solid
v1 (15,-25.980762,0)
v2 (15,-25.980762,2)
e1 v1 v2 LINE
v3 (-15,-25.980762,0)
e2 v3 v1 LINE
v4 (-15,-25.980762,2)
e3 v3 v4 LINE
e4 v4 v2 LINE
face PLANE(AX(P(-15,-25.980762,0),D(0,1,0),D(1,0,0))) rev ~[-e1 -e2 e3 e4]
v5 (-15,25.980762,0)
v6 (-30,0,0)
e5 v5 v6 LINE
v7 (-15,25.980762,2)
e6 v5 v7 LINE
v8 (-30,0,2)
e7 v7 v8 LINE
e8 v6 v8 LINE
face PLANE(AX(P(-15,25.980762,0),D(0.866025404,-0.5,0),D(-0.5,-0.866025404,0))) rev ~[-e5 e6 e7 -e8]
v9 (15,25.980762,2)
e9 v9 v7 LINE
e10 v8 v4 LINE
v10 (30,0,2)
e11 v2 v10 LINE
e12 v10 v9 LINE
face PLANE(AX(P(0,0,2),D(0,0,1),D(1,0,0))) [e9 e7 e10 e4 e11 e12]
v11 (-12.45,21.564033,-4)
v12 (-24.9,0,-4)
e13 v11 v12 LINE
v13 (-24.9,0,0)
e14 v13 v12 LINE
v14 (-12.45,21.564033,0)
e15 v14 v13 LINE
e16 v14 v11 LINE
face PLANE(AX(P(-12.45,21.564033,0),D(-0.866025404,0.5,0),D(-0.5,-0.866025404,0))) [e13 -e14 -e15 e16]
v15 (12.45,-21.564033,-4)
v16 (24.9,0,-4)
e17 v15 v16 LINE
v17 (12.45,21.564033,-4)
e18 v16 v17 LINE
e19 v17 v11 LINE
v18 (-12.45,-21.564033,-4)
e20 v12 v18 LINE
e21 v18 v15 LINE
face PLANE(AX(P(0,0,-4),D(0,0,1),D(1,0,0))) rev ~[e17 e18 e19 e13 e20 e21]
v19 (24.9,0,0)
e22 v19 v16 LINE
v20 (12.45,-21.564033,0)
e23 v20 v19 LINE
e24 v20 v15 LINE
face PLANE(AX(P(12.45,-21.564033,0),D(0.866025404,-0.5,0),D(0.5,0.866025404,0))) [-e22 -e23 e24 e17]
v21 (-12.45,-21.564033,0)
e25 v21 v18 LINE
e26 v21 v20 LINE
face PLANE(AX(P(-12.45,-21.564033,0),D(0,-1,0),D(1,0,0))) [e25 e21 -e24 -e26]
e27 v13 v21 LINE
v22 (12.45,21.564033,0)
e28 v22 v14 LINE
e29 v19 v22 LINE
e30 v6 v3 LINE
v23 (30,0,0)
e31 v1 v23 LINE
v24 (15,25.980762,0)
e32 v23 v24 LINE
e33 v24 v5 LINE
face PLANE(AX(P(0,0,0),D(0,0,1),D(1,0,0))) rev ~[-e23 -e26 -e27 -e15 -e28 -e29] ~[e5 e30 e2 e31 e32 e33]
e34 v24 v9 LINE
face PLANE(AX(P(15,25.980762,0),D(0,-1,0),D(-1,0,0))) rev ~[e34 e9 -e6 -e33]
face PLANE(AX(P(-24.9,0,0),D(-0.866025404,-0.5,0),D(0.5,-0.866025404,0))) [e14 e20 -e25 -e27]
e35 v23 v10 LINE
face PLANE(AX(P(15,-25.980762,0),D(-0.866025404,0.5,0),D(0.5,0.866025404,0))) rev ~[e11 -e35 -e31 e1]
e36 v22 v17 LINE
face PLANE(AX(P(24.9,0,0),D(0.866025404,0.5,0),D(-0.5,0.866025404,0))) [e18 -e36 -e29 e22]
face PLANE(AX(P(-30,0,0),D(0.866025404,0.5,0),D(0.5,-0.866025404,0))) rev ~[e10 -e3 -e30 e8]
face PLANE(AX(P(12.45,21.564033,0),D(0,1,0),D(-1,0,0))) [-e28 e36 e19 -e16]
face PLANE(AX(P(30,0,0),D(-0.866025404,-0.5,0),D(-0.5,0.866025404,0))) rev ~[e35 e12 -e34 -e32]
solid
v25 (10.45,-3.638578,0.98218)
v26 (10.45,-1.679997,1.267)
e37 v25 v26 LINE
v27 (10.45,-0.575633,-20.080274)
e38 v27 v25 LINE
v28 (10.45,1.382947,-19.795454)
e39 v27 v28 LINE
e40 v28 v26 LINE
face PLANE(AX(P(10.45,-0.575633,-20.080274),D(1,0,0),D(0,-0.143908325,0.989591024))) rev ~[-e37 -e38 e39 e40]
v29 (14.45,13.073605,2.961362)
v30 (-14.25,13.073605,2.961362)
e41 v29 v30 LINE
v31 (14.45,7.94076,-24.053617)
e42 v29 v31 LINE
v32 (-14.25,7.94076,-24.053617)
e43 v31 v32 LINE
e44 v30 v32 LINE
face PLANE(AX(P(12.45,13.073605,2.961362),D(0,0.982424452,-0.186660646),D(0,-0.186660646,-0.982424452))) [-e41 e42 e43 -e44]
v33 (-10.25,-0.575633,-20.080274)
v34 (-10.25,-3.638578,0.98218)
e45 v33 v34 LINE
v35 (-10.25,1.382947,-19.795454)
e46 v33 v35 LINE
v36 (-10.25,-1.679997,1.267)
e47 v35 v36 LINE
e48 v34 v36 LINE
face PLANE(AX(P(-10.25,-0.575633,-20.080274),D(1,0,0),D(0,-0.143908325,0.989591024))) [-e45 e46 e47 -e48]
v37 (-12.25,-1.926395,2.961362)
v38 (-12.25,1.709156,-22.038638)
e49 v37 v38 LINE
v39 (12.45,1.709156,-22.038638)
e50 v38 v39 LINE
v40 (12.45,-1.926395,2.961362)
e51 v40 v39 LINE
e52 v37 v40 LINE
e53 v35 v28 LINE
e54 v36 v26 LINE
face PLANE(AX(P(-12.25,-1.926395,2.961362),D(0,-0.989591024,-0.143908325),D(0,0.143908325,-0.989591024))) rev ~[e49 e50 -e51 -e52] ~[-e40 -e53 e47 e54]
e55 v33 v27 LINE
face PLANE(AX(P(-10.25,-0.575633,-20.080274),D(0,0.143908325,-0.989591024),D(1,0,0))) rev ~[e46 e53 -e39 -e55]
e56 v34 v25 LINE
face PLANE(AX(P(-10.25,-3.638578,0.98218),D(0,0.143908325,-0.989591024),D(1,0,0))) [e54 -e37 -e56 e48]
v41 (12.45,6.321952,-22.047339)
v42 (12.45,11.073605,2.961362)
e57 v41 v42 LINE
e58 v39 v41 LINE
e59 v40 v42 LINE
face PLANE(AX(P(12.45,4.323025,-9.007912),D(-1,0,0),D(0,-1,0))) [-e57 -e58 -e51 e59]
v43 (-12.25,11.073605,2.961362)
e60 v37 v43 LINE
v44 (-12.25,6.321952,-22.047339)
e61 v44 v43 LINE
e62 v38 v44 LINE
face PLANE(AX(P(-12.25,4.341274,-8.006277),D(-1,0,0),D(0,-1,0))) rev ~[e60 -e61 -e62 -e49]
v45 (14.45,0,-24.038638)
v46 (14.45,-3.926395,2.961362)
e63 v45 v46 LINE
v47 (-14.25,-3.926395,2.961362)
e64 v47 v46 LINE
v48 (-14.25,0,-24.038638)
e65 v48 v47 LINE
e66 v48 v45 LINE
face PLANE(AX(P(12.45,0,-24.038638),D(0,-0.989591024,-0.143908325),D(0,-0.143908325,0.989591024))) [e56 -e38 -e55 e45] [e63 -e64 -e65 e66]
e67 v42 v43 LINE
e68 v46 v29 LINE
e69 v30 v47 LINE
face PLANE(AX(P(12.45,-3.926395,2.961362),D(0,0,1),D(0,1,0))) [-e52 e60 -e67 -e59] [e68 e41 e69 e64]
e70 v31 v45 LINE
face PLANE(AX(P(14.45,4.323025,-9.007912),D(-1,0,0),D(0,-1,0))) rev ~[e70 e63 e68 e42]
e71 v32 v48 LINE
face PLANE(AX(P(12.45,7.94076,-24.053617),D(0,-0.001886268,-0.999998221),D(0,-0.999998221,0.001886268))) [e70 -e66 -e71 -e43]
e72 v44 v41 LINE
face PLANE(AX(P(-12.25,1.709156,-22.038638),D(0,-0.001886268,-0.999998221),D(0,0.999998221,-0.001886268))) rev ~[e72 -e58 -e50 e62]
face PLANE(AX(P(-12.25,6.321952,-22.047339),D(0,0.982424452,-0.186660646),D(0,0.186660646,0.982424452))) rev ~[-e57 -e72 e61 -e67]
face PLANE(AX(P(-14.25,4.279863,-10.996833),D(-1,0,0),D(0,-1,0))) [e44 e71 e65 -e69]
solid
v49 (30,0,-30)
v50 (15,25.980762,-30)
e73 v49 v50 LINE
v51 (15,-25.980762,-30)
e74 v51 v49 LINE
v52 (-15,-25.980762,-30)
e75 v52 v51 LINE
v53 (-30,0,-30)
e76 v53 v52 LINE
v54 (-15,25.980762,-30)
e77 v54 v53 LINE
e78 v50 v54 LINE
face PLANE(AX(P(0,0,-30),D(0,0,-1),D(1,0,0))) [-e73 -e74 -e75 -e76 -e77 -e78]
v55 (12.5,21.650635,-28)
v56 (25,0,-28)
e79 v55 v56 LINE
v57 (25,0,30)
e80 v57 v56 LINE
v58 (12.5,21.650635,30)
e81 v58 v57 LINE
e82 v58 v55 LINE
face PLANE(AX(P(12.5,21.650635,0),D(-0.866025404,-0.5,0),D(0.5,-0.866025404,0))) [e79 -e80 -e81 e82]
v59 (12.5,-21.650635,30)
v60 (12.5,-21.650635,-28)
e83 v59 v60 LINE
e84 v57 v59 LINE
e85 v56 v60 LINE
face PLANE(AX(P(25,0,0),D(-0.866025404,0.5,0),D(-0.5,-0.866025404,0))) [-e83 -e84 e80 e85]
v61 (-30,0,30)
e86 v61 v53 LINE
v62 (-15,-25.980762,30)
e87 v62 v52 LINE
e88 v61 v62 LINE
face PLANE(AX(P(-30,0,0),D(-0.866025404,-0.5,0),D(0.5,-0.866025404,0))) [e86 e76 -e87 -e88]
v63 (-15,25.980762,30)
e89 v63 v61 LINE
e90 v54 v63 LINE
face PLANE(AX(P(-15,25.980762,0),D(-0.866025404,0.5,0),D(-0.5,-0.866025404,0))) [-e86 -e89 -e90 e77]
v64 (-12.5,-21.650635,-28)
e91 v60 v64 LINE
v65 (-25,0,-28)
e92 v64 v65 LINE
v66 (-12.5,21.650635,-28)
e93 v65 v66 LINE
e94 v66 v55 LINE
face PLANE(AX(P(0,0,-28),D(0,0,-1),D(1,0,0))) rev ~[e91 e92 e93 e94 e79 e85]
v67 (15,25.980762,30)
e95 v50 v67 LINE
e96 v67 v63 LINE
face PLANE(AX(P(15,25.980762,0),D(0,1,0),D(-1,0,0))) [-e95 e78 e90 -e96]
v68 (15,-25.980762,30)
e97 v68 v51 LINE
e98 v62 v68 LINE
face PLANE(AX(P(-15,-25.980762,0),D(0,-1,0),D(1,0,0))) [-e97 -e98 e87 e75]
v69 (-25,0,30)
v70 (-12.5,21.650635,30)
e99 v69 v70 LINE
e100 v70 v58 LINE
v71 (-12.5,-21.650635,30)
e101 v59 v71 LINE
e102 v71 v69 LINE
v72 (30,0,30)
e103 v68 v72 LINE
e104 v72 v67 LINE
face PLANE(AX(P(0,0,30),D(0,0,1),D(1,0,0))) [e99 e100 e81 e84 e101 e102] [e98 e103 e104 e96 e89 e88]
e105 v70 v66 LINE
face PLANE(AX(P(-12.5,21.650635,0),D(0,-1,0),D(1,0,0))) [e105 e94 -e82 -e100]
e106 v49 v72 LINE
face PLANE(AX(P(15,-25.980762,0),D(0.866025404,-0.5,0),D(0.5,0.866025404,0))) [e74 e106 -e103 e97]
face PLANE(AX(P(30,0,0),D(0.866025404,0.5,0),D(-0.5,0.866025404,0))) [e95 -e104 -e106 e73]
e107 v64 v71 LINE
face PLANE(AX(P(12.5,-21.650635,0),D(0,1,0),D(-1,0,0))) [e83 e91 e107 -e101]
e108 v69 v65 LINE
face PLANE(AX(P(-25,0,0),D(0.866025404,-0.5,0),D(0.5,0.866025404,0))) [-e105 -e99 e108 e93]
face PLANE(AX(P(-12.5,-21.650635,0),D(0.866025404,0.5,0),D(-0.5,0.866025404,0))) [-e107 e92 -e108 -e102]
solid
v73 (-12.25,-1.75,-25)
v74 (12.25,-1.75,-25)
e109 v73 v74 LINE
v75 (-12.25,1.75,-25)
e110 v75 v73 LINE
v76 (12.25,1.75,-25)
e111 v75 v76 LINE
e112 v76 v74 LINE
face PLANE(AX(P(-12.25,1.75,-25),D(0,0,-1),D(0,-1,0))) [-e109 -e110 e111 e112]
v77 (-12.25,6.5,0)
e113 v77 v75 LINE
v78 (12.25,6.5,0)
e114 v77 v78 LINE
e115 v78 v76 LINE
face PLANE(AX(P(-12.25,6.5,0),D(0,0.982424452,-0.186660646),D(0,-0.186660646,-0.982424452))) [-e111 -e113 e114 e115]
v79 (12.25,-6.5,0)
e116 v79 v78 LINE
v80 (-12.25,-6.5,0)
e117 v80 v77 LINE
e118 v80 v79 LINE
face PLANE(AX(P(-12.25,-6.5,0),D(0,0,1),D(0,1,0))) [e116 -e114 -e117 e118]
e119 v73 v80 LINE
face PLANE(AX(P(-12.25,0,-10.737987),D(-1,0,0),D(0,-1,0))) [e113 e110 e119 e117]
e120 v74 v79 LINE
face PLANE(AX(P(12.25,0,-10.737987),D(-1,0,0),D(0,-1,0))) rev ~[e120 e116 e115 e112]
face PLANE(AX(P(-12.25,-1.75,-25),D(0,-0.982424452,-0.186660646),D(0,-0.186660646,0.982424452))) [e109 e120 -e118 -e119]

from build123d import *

# Parameters (mm, degrees)
F1_DEPTH  = 30
F4_DEPTH  = 2
F6_DEPTH  = 4
F7_DEPTH  = 2
F13_DEPTH = 24.5
F15_DEPTH = 24.7
F16_DEPTH = 2
F17_DEPTH = 2
F20_DEPTH = 2
F22_W     = 20.7
F22_H     = 21.2839984947
F23_DEPTH = 1.9791820473


with BuildPart() as f1:
    # F0 (on Top) → F1 (new body, symmetric)
    with BuildSketch(Plane.XY):
        Polygon((15, -25.9807621135), (30, 0), (15, 25.9807621135), (-15, 25.9807621135), (-30, 0), (-15, -25.9807621135), align=None)
        Polygon((-12.5, -21.6506350946), (-25, 0), (-12.5, 21.6506350946), (12.5, 21.6506350946), (25, 0), (12.5, -21.6506350946), align=None, mode=Mode.SUBTRACT)
    extrude(amount=F1_DEPTH, both=True)

    # F3 (on 3pt) → F4 (join)
    with BuildSketch(Plane(origin=(0, 0, -30), x_dir=(1, 0, 0), z_dir=(0, 0, -1))):
        Polygon((-25, 0), (-12.5, -21.6506350946), (12.5, -21.6506350946), (25, 0), (12.5, 21.6506350946), (-12.5, 21.6506350946), align=None)
    extrude(amount=-F4_DEPTH)


with BuildPart() as f6:
    # F5 (on Top) → F6 (new body)
    with BuildSketch(Plane.XY):
        Polygon((-12.45, 21.5640325542), (-24.9, 0), (-12.45, -21.5640325542), (12.45, -21.5640325542), (24.9, 0), (12.45, 21.5640325542), align=None)
    extrude(amount=-F6_DEPTH)

    # F5 (on Top) → F7 (join)
    with BuildSketch(Plane.XY):
        Polygon((15, -25.9807621135), (30, 0), (15, 25.9807621135), (-15, 25.9807621135), (-30, 0), (-15, -25.9807621135), align=None)
        Polygon((-12.45, -21.5640325542), (-24.9, 0), (-12.45, 21.5640325542), (12.45, 21.5640325542), (24.9, 0), (12.45, -21.5640325542), align=None, mode=Mode.SUBTRACT)
        Polygon((-12.45, 21.5640325542), (-24.9, 0), (-12.45, -21.5640325542), (12.45, -21.5640325542), (24.9, 0), (12.45, 21.5640325542), align=None)
    extrude(amount=F7_DEPTH)


with BuildPart() as f13:
    # F12 (on 3pt) → F13 (new body)
    with BuildSketch(Plane(origin=(-12.25, 0, 0), x_dir=(0, -1, 0), z_dir=(-1, 0, 0))):
        Polygon((6.5, 0), (-6.5, 0), (-1.75, -25), (1.75, -25), align=None)
    extrude(amount=-F13_DEPTH)


with BuildPart() as f15:
    # F14 (on 3pt) → F15 (new body)
    with BuildSketch(Plane(origin=(-12.25, 0, 0), x_dir=(0, -1, 0), z_dir=(-1, 0, 0))):
        Polygon((-6.321952302, -22.0473393536), (-11.073605489, 2.9613616306), (-13.073605489, 2.9613616306), (-7.9407595883, -24.0536167943), (0, -24.0386383694), (3.926394511, 2.9613616306), (1.926394511, 2.9613616306), (-1.7091559621, -22.0386383694), align=None)
    extrude(amount=-F15_DEPTH)

    # F16 (add): a face of the model
    f16_faces = [f15.faces().sort_by_distance(p)[0] for p in [
        (-12.25, -0.4244847403, -9.5845721632),
    ]]
    extrude(f16_faces, amount=F16_DEPTH)

    # F14 (on 3pt) → F17 (join)
    with BuildSketch(Plane(origin=(-12.25, 0, 0), x_dir=(0, -1, 0), z_dir=(-1, 0, 0))):
        Polygon((1.926394511, 2.9613616306), (-11.073605489, 2.9613616306), (-6.321952302, -22.0473393536), (-1.7091559621, -22.0386383694), align=None)
        Polygon((-6.321952302, -22.0473393536), (-11.073605489, 2.9613616306), (-13.073605489, 2.9613616306), (-7.9407595883, -24.0536167943), (0, -24.0386383694), (3.926394511, 2.9613616306), (1.926394511, 2.9613616306), (-1.7091559621, -22.0386383694), align=None)
    extrude(amount=F17_DEPTH)

    # F19 (on 3pt) → F20 (join)
    with BuildSketch(Plane(origin=(12.45, 0, 0), x_dir=(0, -1, 0), z_dir=(-1, 0, 0))):
        Polygon((3.926394511, 2.9613616306), (-13.073605489, 2.9613616306), (-7.9407595883, -24.0536167943), (0, -24.0386383694), align=None)
    extrude(amount=-F20_DEPTH)

    # F22 (on 3pt) → F23 (cut, through all)
    with BuildSketch(Plane(origin=(0, -3.4233517746, -0.4978307266), x_dir=(1, 0, 0), z_dir=(0, -0.9895910237, -0.1439083246))):
        with Locations((0.1, -9.1464215042)):
            Rectangle(F22_W, F22_H)
    extrude(amount=-F23_DEPTH, mode=Mode.SUBTRACT)


solid = Compound([f1.part, f6.part, f13.part, f15.part])
